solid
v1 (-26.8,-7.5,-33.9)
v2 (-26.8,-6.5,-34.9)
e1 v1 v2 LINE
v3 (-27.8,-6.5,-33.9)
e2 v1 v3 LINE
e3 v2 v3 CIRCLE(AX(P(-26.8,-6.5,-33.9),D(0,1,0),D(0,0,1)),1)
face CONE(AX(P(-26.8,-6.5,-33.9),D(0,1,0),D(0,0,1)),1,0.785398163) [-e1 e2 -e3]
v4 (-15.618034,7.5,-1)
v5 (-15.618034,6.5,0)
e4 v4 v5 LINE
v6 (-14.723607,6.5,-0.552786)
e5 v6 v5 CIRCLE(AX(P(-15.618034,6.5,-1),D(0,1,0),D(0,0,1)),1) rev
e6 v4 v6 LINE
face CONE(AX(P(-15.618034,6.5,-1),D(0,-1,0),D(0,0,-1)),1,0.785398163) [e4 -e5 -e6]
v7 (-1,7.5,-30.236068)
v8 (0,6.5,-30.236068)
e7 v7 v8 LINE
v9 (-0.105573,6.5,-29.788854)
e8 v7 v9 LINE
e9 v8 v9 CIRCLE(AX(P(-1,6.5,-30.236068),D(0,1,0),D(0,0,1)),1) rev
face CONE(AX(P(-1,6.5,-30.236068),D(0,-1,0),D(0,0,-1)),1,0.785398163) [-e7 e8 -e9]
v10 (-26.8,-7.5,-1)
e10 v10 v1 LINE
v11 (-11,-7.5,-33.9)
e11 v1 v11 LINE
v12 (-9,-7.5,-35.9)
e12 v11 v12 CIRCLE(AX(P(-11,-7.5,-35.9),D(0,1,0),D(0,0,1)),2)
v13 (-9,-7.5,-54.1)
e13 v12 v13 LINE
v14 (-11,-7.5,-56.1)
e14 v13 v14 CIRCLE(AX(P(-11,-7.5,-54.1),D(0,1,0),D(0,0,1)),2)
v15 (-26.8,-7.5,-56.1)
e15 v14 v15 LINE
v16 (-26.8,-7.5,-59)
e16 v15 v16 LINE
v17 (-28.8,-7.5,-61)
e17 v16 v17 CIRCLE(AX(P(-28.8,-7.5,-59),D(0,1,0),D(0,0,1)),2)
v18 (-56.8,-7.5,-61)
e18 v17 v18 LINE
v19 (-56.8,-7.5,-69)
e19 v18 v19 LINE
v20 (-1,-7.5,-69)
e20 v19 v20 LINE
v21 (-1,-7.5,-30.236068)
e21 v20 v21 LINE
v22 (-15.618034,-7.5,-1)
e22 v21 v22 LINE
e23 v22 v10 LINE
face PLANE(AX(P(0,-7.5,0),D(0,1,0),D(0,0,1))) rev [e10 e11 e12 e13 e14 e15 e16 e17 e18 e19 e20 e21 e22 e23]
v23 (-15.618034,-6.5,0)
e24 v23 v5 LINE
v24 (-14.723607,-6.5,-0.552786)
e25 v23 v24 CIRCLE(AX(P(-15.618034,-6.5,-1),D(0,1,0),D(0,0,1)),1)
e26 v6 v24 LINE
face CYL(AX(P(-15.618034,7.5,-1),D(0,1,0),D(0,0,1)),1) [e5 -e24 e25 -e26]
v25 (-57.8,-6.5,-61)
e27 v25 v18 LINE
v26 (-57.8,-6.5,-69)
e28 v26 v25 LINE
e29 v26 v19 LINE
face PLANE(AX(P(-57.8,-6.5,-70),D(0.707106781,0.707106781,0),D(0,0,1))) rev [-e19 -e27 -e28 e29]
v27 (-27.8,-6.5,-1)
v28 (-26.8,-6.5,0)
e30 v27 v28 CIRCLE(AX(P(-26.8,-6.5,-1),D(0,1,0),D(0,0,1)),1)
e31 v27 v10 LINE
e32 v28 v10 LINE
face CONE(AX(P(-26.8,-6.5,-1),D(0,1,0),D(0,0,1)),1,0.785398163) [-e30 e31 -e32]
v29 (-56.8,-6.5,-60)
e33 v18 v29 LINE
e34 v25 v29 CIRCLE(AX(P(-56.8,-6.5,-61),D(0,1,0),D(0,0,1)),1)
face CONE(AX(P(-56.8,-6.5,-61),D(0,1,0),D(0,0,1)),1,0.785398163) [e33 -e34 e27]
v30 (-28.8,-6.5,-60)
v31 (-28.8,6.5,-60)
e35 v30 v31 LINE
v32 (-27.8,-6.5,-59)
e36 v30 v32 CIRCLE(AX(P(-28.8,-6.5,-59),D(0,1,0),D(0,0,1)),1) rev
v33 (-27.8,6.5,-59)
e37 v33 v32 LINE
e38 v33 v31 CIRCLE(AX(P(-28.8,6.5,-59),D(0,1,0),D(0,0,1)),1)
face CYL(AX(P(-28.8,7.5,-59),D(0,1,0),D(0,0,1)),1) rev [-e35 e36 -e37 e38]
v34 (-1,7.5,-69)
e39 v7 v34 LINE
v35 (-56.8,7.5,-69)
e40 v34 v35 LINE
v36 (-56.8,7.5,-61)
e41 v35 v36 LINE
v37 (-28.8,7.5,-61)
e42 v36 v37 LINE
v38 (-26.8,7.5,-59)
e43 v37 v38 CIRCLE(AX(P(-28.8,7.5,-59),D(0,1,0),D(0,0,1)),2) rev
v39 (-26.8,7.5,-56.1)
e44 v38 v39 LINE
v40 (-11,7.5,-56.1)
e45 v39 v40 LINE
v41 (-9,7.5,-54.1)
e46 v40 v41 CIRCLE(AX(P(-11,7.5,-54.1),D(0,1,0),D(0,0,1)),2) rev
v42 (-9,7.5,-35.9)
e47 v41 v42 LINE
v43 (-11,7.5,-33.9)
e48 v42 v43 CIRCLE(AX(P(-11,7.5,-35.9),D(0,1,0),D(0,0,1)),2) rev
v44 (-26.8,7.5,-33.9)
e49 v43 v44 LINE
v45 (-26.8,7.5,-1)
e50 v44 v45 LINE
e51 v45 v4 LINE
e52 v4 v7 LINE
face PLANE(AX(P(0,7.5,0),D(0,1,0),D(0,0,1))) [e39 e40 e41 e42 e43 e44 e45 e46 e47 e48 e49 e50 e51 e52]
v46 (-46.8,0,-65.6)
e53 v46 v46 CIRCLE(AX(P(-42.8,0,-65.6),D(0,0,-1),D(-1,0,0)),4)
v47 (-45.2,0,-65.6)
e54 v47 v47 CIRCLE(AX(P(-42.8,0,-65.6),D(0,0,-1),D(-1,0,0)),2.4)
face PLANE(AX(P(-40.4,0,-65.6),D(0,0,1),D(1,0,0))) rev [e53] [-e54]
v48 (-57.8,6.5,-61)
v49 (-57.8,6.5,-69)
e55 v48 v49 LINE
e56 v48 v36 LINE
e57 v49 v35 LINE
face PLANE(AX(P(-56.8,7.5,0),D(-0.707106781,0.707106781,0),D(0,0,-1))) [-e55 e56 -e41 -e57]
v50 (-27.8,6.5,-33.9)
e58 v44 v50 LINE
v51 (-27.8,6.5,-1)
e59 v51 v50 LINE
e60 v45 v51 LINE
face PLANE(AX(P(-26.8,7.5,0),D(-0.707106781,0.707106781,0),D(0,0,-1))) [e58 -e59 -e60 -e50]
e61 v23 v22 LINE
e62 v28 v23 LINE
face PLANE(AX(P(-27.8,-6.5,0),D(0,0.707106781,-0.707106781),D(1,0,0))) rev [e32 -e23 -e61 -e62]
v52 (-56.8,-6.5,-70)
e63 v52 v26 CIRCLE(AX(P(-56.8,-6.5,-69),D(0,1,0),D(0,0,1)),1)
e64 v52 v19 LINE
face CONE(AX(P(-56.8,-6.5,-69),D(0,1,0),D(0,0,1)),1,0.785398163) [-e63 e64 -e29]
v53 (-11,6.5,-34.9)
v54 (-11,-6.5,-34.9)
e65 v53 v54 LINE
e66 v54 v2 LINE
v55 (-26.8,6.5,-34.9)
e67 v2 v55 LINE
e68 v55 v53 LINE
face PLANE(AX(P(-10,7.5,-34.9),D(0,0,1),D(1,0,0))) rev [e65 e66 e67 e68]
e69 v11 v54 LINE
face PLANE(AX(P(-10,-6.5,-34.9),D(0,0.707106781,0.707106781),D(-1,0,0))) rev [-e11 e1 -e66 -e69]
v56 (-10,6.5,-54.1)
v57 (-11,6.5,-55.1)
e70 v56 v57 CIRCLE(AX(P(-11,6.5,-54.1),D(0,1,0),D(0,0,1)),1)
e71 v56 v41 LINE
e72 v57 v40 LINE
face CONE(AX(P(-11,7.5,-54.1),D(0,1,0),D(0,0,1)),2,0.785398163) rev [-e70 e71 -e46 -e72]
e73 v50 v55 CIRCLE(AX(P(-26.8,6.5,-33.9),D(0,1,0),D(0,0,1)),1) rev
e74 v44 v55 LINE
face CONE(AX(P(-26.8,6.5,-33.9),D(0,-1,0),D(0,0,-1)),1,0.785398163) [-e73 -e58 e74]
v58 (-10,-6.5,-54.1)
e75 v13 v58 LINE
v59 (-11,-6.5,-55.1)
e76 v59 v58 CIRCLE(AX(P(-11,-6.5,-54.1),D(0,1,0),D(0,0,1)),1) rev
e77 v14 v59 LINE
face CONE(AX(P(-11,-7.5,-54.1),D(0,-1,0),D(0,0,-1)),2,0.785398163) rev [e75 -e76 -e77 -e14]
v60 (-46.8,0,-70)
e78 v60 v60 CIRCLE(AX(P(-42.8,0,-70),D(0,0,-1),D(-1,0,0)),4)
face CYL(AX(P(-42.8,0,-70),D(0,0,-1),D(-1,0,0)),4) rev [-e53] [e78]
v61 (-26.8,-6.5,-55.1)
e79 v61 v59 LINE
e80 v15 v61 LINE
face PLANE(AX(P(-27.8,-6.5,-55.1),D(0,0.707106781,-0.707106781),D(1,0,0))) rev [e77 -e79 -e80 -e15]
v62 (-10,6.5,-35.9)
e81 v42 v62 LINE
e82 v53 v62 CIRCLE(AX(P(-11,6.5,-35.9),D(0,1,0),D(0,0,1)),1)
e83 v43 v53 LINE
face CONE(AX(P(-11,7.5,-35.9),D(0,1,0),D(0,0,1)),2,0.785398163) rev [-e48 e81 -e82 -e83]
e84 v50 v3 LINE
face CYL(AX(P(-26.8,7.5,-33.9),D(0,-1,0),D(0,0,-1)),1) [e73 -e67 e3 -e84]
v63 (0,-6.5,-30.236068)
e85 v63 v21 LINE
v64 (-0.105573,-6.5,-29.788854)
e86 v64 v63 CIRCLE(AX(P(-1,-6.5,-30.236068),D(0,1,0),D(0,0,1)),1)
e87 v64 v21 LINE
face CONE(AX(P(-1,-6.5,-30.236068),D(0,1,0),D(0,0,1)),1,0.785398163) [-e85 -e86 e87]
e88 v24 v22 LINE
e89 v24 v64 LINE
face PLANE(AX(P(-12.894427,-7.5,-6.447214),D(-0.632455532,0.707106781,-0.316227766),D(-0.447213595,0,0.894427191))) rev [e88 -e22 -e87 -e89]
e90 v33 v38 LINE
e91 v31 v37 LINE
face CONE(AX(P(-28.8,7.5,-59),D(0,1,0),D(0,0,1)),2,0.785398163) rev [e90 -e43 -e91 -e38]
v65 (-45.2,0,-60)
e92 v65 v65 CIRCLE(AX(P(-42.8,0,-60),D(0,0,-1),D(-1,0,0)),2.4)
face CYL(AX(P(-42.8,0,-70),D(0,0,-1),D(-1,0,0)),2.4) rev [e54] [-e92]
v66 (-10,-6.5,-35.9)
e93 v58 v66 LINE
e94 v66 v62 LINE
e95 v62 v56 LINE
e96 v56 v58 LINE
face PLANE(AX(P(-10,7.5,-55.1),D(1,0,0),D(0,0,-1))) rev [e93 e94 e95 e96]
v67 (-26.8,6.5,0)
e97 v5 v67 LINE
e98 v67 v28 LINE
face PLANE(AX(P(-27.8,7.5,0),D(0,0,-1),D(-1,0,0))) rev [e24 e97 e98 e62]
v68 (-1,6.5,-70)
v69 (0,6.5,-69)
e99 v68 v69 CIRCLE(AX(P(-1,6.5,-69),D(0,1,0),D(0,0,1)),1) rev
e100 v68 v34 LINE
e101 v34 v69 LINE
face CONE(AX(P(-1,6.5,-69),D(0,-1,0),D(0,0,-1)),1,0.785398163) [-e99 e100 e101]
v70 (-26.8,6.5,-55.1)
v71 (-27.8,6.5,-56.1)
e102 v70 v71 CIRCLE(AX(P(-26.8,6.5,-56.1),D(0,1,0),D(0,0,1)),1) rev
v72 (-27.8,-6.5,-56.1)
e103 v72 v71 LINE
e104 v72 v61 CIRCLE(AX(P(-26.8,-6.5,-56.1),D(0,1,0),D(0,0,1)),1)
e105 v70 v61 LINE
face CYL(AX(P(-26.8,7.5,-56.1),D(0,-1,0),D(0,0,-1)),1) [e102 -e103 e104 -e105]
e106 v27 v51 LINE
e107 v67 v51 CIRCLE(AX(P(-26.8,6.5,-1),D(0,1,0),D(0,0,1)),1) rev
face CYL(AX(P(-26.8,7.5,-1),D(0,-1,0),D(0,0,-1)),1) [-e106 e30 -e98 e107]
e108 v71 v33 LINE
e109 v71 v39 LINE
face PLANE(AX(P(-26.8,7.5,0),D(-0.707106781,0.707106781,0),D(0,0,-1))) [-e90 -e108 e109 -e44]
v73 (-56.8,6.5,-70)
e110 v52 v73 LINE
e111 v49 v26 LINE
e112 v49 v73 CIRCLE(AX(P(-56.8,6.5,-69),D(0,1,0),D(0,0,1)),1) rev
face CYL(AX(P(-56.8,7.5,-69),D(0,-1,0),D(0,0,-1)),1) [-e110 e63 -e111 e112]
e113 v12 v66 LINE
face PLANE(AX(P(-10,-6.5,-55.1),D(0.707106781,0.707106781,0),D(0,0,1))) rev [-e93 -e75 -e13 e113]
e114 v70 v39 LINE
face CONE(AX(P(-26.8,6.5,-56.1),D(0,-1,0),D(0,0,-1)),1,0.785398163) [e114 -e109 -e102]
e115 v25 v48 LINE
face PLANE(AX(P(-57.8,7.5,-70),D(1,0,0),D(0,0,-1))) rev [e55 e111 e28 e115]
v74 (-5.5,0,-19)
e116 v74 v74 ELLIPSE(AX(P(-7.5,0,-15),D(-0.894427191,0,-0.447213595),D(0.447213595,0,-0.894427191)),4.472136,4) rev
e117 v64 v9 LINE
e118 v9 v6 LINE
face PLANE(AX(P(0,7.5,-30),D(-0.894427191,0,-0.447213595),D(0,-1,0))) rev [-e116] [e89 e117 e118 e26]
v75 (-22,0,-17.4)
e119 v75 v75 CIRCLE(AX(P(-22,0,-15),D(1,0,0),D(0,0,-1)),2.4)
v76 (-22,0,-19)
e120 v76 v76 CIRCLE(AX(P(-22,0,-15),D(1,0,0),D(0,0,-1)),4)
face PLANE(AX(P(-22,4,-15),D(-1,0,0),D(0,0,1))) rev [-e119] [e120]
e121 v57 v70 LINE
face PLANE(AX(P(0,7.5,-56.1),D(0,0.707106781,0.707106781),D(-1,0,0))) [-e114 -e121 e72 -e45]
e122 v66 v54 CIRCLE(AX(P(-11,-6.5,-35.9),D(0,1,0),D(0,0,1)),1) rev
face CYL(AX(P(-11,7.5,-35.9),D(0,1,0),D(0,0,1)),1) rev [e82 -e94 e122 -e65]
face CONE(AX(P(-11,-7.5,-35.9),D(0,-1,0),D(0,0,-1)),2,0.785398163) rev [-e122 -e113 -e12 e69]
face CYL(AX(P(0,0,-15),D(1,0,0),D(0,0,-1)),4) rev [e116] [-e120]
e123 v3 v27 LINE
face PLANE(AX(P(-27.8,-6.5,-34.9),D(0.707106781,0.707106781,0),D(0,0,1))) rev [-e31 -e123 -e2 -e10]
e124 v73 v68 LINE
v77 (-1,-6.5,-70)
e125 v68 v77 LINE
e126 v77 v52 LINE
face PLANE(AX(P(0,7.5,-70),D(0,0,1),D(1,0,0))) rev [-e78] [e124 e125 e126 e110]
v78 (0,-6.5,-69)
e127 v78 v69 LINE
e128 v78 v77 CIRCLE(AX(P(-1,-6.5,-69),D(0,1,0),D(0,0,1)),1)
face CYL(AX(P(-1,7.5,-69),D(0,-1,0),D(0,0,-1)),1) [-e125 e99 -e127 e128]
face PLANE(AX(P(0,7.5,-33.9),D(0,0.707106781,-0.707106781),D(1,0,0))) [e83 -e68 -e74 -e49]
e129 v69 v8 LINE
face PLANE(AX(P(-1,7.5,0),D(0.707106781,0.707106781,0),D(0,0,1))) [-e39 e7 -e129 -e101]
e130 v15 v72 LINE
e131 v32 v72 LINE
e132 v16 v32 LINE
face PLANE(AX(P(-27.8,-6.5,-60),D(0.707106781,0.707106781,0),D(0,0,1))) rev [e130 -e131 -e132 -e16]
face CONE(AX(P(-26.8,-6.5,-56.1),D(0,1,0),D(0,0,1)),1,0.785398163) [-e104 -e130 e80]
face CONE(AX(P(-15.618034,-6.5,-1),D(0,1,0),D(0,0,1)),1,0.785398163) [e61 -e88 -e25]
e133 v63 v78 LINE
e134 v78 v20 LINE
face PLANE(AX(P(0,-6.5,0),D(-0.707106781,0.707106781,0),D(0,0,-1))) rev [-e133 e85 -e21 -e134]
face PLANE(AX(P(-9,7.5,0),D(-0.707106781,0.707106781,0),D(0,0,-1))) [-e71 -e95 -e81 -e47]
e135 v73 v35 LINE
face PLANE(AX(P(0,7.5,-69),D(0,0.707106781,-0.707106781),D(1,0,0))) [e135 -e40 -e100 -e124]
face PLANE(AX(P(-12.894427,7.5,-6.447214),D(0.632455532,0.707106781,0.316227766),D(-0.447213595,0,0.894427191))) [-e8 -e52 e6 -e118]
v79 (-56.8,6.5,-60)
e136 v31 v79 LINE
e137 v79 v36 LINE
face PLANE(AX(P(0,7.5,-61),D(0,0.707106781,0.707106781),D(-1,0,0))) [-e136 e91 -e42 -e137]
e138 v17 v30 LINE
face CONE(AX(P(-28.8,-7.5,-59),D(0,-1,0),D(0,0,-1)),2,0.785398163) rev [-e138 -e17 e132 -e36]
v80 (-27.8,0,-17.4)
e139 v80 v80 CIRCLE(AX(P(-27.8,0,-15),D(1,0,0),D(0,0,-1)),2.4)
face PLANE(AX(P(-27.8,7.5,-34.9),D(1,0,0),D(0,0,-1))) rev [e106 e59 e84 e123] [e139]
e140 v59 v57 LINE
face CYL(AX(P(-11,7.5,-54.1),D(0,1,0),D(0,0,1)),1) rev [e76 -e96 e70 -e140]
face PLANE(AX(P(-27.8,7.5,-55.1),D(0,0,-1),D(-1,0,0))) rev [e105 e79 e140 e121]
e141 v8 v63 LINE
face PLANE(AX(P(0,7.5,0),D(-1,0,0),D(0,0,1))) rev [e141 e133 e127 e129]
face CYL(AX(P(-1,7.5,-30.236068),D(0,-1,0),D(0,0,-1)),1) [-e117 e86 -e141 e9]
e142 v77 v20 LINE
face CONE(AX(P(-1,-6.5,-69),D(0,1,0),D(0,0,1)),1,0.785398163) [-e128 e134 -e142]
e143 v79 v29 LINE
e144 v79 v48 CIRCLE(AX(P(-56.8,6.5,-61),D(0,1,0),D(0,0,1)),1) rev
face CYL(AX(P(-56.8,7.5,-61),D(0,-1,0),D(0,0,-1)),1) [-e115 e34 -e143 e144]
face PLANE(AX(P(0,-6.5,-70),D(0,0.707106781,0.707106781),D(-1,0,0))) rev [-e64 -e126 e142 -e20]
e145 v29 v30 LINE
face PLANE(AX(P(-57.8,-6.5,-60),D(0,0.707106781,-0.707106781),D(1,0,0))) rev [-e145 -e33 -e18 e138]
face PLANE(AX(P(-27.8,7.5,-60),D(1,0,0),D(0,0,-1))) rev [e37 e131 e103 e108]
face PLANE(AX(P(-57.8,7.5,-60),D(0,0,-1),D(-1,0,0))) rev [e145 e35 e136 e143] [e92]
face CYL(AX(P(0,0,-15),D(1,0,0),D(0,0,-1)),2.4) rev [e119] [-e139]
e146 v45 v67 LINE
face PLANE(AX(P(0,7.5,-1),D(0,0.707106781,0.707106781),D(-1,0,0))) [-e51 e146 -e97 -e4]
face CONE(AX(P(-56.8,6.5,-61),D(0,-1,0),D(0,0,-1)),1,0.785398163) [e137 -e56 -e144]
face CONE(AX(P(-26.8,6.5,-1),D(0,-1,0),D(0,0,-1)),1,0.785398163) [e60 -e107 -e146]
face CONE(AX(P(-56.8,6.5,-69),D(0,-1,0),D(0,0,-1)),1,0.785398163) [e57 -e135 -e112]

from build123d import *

# Parameters (mm, degrees)
BOSS_EXTRUDE1_DEPTH                                 = 7.5
CBORE_FOR_M4_HEX_SOCKET_HEAD_CAP_SCREW2_D           = 4.8
CBORE_FOR_M4_HEX_SOCKET_HEAD_CAP_SCREW2_CBORE_D     = 8
CBORE_FOR_M4_HEX_SOCKET_HEAD_CAP_SCREW2_CBORE_DEPTH = 4.4
CHAMFER1_SIZE                                       = 30
CHAMFER1_SIZE_2                                     = 15
FILLET1_R                                           = 1
CHAMFER2_SIZE                                       = 1


# Some blends are built 0.0001 mm under size
with BuildPart() as part:
    # Sketch2 → Boss-Extrude1 (new, symmetric)
    with BuildSketch(Plane(origin=(0, 0, 0), x_dir=(1, 0, 0), z_dir=(0, 1, 0))):
        Polygon((0, 0), (0, 70), (-57.8, 70), (-57.8, 60), (-27.8, 60), (-27.8, 55.1), (-10, 55.1), (-10, 34.9), (-27.8, 34.9), (-27.8, 0), align=None)
    extrude(amount=BOSS_EXTRUDE1_DEPTH, both=True)

    # Sketch4 → CBORE for M4 Hex Socket Head Cap Screw1 (revolve, cut)
    with BuildSketch(Plane(origin=(0, 0, -15), x_dir=(0, 0, -1), z_dir=(0, 1, 0))):
        Polygon((0, 0), (0, 27.8), (2.4, 27.8), (2.4, 22), (4, 22), (4, 0.025), (4.025, 0), align=None)
    revolve(axis=Axis((6.35, 0, -15), (-1, 0, 0)), mode=Mode.SUBTRACT)

    # CBORE for M4 Hex Socket Head Cap Screw2 (through all)
    with Locations(Plane(origin=(0, 0, -70), x_dir=(-1, 0, 0), z_dir=(0, 0, -1))):
        with Locations((42.8, 0)):
            CounterBoreHole(CBORE_FOR_M4_HEX_SOCKET_HEAD_CAP_SCREW2_D / 2, CBORE_FOR_M4_HEX_SOCKET_HEAD_CAP_SCREW2_CBORE_D / 2, CBORE_FOR_M4_HEX_SOCKET_HEAD_CAP_SCREW2_CBORE_DEPTH)

    # Chamfer1
    # the kernel refuses this chamfer: 30, 15 mm, written as the material it takes off along each edge
    with BuildSketch(Plane(origin=(0, 85.194866214, 0), x_dir=(0.01726807512366813, 0, -0.9998508956747117), z_dir=(0, -1, 0))) as chamfer1_piece_1:
        Polygon((CHAMFER1_SIZE * 0.999850895675, -CHAMFER1_SIZE * 0.0172680751237), (-CHAMFER1_SIZE_2 * 0.0172680751237, -CHAMFER1_SIZE_2 * 0.999850895675), (0, 0), align=None)
    extrude(amount=170.389732427, mode=Mode.SUBTRACT)

    # Fillet1
    fillet1_edges = [part.edges().sort_by_distance(p)[0] for p in [
        (0, 0, -70),
        (-27.8, 0, 0),
        (-27.8, 0, -34.9),
        (-10, 0, -34.9),
        (-10, 0, -55.1),
        (-27.8, 0, -55.1),
        (-27.8, 0, -60),
        (-57.8, 0, -60),
        (-57.8, 0, -70),
        (0, 0, -30),
        (-15, 0, 0),
    ]]
    fillet(fillet1_edges, radius=FILLET1_R)

    # Chamfer2
    chamfer2_edges = [part.edges().sort_by_distance(p)[0] for p in [
        (-28.092893219, -7.5, -59.707106781),
        (-28.092893219, 7.5, -59.707106781),
        (-10.292893219, -7.5, -35.192893219),
        (-10.292893219, 7.5, -35.192893219),
        (-10.292893219, -7.5, -54.807106781),
        (-10.292893219, 7.5, -54.807106781),
        (-27.8, -7.5, -57.55),
        (-27.8, 7.5, -57.55),
        (-42.8, -7.5, -60),
        (-42.8, 7.5, -60),
        (-18.9, -7.5, -34.9),
        (-18.9, 7.5, -34.9),
        (-10, -7.5, -45),
        (-10, 7.5, -45),
        (-18.9, -7.5, -55.1),
        (-18.9, 7.5, -55.1),
        (-57.8, -7.5, -65),
        (-57.8, 7.5, -65),
        (0, -7.5, -49.618033989),
        (-7.414589803, -7.5, -15.170820393),
        (-21.209016994, -7.5, 0),
        (-27.8, -7.5, -17.45),
        (-28.9, -7.5, -70),
        (-27.507106781, -7.5, -55.392893219),
        (-27.507106781, -7.5, -34.607106781),
        (-57.507106781, -7.5, -60.292893219),
        (-27.507106781, -7.5, -0.292893219),
        (-15.092302877, -7.5, -0.149349192),
        (-0.026751011, -7.5, -30.006315057),
        (-0.292893219, -7.5, -69.707106781),
        (-57.507106781, -7.5, -69.707106781),
        (-28.9, 7.5, -70),
        (-21.209016994, 7.5, 0),
        (-7.414589803, 7.5, -15.170820393),
        (0, 7.5, -49.618033989),
        (-27.8, 7.5, -17.45),
        (-27.507106781, 7.5, -55.392893219),
        (-27.507106781, 7.5, -34.607106781),
        (-57.507106781, 7.5, -60.292893219),
        (-27.507106781, 7.5, -0.292893219),
        (-15.092302877, 7.5, -0.149349192),
        (-0.026751011, 7.5, -30.006315057),
        (-0.292893219, 7.5, -69.707106781),
        (-57.507106781, 7.5, -69.707106781),
    ]]
    chamfer(chamfer2_edges, length=CHAMFER2_SIZE - 0.0001)  # a hair under: the kernel refuses the full size


solid = part.part
